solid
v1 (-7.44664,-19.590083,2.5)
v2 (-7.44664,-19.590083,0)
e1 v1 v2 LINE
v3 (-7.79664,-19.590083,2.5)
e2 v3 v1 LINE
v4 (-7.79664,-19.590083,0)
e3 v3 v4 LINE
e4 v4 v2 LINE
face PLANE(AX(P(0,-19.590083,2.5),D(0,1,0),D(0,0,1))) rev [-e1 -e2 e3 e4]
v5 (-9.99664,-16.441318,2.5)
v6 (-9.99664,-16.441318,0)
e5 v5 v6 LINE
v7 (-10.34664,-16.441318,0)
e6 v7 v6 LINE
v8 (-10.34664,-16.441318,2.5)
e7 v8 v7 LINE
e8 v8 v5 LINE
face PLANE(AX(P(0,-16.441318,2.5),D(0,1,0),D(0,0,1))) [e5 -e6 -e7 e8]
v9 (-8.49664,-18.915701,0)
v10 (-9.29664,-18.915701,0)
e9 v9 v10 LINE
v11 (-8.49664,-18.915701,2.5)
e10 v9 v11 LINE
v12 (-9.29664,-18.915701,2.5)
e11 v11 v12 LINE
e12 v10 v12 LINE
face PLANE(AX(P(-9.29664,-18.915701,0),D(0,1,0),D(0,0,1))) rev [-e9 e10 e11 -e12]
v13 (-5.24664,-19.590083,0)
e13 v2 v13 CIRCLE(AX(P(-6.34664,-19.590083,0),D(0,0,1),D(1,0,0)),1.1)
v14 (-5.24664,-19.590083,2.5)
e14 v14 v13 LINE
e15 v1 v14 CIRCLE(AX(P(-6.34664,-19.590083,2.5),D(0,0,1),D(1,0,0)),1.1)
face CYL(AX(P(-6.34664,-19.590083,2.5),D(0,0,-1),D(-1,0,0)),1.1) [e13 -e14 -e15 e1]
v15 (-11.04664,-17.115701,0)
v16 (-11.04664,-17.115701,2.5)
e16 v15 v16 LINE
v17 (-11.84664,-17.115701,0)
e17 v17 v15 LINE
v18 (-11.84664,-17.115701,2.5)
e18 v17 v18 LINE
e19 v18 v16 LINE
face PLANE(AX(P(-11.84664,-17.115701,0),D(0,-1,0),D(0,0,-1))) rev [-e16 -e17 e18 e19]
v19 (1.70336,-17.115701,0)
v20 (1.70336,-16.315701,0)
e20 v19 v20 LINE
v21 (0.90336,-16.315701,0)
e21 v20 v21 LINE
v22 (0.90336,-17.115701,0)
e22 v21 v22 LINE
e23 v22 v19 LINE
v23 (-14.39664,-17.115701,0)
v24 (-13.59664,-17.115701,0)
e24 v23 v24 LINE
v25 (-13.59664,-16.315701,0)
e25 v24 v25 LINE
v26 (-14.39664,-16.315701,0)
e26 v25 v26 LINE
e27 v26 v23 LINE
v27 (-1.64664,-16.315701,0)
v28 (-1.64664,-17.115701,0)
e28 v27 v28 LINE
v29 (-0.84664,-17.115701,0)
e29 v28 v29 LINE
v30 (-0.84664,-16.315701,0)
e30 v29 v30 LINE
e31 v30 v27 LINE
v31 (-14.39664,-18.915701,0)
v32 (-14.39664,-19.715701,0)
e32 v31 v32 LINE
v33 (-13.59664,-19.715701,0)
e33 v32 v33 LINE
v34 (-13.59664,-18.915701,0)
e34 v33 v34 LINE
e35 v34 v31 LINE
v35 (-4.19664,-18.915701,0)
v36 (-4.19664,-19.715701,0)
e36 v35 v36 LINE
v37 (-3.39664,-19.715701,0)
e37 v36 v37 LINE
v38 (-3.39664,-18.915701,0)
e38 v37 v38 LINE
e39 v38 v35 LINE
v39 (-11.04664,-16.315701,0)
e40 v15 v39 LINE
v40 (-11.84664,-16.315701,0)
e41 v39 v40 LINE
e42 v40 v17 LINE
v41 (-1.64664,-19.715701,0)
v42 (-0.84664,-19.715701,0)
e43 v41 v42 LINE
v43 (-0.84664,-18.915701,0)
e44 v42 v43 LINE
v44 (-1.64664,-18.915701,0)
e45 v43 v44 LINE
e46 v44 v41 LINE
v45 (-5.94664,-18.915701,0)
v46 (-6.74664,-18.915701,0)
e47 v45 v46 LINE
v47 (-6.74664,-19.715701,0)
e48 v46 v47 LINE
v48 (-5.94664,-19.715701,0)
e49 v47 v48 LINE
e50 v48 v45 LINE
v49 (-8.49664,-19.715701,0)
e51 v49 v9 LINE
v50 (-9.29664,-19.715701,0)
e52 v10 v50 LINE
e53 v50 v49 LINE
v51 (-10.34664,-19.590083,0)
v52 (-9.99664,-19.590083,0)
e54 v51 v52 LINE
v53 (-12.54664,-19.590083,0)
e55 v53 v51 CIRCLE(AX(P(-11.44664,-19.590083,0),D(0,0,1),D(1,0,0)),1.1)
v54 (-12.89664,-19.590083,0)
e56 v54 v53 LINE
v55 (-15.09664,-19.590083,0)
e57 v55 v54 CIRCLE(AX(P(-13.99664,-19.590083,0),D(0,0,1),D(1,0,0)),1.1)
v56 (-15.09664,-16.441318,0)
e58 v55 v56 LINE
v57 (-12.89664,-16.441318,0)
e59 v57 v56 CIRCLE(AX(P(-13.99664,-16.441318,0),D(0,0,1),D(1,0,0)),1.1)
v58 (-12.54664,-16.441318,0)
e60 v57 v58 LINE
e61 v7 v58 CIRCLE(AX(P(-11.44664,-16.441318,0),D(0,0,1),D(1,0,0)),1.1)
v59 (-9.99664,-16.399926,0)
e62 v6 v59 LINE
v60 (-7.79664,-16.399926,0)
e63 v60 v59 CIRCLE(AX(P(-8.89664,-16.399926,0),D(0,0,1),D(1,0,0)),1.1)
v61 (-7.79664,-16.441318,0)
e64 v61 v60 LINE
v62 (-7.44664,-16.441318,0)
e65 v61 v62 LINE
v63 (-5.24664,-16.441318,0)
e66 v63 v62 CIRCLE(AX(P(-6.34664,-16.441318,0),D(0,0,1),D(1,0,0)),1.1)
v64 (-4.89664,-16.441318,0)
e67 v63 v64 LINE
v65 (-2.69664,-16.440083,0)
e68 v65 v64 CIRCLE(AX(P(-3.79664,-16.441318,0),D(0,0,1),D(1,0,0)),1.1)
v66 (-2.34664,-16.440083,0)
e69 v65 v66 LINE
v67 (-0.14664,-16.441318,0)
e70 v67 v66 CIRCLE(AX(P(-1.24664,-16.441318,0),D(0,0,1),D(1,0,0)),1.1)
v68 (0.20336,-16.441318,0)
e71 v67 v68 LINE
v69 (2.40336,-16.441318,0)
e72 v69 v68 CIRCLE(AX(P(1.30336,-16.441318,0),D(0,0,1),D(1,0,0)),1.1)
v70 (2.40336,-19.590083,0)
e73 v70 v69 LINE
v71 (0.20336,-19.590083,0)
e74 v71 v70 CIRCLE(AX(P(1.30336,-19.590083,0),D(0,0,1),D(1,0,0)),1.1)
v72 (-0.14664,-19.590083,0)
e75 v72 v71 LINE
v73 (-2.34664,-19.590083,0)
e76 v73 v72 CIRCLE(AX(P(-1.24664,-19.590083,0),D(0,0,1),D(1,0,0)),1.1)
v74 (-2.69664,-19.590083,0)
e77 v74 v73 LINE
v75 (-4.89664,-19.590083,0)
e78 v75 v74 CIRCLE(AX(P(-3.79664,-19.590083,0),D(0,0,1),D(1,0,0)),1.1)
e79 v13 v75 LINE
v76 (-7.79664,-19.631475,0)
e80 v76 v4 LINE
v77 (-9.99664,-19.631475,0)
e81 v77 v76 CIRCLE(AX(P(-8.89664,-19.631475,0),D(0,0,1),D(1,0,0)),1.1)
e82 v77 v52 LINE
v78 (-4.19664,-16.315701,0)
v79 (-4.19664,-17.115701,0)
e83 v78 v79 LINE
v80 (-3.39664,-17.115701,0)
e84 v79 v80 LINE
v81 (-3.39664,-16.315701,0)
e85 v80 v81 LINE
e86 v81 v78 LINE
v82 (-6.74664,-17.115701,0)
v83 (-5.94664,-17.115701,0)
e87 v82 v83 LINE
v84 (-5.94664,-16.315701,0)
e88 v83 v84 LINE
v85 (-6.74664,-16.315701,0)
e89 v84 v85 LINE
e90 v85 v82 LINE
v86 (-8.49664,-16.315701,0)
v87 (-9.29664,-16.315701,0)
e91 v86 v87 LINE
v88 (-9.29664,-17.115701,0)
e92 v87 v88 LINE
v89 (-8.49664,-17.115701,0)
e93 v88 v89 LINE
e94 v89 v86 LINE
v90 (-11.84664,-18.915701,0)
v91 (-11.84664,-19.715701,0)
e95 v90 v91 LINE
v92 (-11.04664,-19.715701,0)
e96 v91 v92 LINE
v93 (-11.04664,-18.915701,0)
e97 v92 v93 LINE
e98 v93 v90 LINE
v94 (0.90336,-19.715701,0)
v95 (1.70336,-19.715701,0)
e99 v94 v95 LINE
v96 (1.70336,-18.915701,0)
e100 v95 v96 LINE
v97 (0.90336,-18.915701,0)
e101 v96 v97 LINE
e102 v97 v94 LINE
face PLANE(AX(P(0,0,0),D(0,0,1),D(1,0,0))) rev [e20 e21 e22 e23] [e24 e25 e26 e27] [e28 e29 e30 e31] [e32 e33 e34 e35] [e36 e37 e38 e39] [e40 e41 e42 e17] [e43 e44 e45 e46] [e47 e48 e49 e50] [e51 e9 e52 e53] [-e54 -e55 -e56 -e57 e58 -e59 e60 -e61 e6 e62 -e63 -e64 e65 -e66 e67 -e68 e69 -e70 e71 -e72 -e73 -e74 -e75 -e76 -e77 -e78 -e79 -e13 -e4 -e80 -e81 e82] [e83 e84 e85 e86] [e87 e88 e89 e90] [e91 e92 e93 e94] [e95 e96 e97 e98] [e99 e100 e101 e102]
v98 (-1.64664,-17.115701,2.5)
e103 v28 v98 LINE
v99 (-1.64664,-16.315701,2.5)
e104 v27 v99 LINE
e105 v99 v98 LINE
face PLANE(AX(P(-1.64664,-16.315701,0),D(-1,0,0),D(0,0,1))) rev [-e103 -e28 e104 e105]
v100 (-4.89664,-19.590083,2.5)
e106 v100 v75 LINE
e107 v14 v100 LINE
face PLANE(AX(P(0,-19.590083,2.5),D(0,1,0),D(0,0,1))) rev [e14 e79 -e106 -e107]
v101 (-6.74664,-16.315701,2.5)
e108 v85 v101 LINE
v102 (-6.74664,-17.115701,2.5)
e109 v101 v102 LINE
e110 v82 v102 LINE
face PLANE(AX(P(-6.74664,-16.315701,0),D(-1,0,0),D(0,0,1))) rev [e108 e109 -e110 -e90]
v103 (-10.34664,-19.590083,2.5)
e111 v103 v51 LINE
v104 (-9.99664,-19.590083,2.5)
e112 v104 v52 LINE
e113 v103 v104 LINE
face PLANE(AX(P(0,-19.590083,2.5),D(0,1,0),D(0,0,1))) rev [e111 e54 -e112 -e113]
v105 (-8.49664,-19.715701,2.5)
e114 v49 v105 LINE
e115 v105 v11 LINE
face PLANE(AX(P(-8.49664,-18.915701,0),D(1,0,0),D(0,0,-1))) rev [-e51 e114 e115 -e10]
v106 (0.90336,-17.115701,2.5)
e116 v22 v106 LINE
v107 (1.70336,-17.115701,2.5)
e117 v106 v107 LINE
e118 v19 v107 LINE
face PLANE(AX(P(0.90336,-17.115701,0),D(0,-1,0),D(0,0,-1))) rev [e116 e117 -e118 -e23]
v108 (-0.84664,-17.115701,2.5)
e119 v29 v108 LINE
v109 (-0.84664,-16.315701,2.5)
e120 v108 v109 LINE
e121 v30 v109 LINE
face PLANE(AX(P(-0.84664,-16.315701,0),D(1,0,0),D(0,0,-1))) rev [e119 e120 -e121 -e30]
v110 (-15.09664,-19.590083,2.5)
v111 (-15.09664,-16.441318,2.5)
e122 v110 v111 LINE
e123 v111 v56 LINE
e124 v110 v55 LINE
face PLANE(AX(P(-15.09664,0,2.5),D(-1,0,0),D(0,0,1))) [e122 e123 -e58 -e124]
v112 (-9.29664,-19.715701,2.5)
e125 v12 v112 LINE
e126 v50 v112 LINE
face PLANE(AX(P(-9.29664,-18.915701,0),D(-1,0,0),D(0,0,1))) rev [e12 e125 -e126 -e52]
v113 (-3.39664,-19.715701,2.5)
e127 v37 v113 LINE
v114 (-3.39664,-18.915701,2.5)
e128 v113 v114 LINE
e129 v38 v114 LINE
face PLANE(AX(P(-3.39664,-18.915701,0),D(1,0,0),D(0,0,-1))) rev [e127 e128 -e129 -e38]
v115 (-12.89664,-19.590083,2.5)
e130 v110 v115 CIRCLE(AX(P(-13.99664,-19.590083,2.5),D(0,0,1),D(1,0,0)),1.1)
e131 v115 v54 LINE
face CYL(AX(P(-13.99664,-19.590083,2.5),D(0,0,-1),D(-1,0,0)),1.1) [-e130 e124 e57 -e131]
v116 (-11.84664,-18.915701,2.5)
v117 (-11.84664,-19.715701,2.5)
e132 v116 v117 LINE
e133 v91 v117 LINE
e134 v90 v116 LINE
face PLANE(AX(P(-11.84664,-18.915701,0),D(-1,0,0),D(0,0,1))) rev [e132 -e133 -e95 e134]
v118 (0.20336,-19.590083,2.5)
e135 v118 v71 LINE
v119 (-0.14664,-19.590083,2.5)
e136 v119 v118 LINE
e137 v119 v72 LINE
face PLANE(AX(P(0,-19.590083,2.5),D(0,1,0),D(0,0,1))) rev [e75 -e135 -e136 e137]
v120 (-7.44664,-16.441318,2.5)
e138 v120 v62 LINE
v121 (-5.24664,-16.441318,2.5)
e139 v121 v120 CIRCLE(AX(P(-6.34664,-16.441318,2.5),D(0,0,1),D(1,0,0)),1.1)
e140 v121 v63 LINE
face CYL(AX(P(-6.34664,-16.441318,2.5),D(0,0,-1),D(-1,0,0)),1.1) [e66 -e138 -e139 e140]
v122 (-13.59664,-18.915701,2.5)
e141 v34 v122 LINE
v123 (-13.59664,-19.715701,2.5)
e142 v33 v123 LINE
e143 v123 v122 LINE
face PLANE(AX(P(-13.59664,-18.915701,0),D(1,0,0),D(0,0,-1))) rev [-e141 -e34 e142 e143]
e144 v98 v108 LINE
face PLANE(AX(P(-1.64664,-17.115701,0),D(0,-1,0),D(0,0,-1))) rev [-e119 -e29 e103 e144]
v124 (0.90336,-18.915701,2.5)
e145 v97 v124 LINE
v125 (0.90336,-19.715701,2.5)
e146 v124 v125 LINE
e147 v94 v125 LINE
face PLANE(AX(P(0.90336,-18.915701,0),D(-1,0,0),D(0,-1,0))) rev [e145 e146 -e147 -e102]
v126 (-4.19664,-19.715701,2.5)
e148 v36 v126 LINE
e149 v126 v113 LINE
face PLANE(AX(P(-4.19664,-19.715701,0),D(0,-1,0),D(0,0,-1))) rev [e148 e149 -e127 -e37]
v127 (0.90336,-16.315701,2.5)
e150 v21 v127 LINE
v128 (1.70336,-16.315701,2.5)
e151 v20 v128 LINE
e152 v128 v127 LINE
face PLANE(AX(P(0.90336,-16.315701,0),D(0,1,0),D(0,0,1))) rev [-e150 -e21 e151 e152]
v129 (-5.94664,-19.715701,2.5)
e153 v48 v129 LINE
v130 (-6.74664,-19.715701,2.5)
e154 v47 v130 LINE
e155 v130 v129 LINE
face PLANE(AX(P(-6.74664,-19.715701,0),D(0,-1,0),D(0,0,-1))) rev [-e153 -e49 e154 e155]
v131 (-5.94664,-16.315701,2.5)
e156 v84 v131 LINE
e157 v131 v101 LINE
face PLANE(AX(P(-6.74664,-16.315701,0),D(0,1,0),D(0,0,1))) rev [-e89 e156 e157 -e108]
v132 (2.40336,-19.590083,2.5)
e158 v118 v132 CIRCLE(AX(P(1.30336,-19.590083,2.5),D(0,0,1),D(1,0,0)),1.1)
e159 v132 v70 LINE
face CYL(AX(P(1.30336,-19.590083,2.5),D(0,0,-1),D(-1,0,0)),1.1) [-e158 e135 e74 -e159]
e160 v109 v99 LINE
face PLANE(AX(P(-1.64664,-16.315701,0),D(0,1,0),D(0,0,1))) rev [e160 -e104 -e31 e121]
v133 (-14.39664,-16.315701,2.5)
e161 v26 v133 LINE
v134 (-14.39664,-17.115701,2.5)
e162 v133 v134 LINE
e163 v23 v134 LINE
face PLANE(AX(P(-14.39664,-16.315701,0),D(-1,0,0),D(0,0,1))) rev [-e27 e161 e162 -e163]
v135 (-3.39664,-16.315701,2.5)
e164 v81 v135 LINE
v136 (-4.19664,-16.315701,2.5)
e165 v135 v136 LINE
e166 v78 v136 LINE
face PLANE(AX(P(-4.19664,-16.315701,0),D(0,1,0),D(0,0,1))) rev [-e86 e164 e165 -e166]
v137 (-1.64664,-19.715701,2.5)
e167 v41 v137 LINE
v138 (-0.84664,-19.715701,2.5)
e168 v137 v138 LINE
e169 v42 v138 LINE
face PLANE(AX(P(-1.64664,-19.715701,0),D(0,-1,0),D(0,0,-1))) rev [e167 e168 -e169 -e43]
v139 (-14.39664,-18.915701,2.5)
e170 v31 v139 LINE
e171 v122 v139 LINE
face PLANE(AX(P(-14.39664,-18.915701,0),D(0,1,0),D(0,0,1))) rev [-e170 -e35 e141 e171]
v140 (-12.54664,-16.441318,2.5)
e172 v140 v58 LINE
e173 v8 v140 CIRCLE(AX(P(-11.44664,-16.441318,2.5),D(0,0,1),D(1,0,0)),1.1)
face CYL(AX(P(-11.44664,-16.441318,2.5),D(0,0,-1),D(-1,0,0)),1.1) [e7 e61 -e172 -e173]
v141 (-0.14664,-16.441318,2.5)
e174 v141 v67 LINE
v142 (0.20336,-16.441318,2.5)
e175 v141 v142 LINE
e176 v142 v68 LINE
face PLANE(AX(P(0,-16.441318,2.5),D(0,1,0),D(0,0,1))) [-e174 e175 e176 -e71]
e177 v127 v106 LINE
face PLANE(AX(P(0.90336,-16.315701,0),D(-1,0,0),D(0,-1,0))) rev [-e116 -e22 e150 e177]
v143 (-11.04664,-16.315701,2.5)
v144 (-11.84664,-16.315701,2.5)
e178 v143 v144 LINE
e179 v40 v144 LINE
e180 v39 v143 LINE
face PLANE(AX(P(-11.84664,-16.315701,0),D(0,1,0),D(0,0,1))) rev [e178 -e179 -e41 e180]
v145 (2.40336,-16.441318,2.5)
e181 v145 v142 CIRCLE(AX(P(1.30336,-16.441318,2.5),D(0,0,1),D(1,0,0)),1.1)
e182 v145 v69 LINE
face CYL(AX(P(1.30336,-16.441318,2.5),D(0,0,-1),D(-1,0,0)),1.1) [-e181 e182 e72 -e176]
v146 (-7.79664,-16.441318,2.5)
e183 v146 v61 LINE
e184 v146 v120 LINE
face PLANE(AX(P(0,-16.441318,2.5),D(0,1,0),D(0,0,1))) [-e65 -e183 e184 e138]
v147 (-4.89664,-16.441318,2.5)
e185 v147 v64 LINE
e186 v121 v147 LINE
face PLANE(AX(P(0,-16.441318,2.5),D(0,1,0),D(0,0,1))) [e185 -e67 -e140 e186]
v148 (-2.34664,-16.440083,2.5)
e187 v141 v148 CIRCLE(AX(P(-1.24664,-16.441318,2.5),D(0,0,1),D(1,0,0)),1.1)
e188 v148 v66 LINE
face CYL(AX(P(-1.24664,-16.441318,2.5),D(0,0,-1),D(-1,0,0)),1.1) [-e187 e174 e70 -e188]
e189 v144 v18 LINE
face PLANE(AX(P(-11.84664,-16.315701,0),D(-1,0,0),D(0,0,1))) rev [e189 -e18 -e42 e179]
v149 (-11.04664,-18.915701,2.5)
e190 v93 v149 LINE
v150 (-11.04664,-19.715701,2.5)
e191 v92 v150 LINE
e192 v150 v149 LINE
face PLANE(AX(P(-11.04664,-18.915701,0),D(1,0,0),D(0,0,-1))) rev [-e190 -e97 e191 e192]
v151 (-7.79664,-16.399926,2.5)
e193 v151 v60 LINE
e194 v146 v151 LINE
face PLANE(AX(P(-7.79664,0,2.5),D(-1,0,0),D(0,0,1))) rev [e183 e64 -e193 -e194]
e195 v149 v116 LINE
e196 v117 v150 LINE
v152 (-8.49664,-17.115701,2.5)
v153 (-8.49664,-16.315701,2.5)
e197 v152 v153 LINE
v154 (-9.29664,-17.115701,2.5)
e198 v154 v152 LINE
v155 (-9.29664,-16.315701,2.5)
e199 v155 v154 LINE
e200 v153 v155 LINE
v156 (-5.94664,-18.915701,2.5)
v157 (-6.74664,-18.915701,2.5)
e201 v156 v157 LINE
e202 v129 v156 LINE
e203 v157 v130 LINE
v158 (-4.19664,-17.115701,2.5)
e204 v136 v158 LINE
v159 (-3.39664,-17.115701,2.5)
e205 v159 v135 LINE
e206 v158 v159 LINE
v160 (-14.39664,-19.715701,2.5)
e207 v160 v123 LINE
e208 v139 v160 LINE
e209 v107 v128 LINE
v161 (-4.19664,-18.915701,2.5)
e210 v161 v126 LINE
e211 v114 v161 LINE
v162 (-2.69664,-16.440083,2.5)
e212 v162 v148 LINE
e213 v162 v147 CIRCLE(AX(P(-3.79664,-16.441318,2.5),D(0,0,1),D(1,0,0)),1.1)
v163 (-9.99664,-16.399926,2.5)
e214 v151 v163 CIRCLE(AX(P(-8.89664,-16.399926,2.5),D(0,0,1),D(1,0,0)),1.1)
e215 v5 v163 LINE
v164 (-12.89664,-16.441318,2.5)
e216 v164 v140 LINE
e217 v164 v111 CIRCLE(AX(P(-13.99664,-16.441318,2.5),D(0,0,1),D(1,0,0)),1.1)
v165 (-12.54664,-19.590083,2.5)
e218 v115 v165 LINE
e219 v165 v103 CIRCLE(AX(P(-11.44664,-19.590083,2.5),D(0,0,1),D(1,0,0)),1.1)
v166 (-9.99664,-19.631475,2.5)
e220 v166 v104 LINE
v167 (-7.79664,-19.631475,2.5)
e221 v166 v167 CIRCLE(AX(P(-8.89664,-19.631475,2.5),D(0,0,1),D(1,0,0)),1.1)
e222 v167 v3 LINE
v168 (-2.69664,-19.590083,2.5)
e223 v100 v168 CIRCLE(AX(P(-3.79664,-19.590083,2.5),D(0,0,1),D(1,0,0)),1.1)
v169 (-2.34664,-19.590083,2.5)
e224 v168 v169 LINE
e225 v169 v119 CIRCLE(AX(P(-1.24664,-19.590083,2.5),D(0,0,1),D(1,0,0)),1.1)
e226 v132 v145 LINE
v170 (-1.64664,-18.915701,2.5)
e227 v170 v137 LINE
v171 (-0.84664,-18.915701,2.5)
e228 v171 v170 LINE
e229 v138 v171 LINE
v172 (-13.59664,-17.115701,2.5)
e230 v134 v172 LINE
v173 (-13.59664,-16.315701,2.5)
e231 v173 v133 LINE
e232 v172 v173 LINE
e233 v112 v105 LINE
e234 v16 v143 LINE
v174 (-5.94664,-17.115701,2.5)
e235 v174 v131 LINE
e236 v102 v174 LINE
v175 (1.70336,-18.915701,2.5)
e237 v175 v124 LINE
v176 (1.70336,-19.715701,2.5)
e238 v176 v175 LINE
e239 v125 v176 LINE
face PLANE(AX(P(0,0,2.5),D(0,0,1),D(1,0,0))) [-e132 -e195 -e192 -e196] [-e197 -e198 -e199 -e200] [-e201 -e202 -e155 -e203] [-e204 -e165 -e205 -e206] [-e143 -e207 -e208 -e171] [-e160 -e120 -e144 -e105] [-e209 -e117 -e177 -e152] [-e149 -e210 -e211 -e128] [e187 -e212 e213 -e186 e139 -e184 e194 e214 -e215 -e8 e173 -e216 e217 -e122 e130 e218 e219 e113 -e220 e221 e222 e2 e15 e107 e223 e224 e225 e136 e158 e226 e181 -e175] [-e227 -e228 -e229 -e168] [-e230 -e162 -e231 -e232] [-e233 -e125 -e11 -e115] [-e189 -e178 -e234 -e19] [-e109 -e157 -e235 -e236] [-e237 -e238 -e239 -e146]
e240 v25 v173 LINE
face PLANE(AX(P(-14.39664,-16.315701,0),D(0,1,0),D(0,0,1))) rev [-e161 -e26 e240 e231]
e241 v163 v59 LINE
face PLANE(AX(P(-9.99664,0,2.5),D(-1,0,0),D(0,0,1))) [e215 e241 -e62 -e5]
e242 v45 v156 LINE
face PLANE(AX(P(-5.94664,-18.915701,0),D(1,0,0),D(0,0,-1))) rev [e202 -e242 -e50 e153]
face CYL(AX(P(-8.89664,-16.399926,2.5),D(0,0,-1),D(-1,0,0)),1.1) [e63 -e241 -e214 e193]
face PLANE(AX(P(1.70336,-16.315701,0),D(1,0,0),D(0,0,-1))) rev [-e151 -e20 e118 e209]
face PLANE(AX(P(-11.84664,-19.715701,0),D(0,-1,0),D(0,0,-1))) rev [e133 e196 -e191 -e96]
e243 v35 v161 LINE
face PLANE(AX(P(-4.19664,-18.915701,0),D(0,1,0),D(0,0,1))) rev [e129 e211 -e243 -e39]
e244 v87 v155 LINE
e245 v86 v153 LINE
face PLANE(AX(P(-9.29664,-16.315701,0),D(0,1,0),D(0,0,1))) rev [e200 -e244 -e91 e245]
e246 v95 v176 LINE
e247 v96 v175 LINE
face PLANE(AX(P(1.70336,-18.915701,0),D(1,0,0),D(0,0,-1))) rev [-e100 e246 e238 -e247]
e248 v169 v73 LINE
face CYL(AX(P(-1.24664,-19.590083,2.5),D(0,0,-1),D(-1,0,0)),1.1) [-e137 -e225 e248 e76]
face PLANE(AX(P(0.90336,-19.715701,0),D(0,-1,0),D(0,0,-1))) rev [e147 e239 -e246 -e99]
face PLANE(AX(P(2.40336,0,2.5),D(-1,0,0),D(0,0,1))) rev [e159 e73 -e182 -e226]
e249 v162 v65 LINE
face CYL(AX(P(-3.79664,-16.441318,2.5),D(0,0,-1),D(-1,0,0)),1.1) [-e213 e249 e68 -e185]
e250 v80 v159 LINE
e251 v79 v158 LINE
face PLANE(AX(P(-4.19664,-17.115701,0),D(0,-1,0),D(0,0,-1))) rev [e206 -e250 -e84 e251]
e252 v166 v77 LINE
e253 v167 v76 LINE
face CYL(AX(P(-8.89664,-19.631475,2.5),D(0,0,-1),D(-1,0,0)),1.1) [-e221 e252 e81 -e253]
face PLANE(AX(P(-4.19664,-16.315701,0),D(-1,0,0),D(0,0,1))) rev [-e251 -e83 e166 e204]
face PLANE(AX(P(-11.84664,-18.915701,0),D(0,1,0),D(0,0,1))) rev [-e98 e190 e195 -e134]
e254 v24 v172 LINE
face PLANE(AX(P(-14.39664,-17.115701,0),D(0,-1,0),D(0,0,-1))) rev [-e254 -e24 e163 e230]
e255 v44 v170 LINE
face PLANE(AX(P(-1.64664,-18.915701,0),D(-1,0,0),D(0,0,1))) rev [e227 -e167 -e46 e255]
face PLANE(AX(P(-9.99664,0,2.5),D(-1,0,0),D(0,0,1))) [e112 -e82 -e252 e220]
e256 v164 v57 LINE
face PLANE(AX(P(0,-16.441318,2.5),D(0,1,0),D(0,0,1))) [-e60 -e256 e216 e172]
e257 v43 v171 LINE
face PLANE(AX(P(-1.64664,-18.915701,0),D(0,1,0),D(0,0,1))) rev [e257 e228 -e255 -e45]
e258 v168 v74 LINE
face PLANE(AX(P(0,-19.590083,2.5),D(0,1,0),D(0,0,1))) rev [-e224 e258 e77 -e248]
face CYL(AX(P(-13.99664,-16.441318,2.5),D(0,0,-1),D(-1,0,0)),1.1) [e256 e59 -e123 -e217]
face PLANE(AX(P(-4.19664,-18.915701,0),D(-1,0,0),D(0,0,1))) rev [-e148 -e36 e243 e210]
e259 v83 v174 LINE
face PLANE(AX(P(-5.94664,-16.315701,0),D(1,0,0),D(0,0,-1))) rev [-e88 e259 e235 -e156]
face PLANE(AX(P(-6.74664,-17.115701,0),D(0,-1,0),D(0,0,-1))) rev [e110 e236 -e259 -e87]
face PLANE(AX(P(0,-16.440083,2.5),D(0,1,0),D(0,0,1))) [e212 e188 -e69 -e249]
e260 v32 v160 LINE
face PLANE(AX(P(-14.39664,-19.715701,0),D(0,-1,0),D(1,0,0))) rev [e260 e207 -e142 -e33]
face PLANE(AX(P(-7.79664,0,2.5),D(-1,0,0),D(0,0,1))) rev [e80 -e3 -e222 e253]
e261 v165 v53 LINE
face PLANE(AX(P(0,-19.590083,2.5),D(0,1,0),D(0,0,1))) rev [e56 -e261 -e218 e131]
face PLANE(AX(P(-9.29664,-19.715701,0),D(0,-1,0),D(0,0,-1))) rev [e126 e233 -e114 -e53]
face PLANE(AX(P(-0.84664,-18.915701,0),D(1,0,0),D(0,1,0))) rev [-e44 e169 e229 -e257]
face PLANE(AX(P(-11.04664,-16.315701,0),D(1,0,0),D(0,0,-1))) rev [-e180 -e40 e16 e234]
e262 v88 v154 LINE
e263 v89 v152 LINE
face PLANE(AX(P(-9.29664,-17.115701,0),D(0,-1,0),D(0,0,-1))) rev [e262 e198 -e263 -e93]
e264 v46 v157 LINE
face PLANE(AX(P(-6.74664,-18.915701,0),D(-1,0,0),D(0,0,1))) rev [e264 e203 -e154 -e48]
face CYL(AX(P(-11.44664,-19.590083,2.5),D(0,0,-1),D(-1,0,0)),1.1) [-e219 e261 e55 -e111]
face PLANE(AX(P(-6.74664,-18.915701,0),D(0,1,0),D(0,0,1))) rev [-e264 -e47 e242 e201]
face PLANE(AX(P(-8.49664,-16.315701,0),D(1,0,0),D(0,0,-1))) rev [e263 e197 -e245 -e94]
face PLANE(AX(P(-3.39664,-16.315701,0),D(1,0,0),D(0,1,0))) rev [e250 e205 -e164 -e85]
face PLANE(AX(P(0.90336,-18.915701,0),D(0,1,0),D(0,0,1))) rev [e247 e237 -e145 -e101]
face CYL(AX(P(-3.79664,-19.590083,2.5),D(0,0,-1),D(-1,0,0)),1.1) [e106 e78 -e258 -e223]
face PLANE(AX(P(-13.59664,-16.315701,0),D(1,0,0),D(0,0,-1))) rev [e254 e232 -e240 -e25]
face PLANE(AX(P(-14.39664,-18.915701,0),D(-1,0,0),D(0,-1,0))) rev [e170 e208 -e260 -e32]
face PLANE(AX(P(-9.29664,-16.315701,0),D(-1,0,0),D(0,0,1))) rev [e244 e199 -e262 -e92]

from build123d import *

# Parameters (mm, degrees)
P_IDAT_VYSUNUT_M2_DEPTH  = 2.5
SKICA3_W                 = 0.8
SKICA3_H                 = 0.8
ODEBRAT_VYSUNUT_M1_DEPTH = 2.5


# Read off the part's stored shape, not the designer's step: Přidat vysunutím2
with BuildPart() as part:
    # Přidat vysunutím2 outline → Přidat vysunutím2 (new body)
    with BuildSketch(Plane.XY):
        with BuildLine():
            Line((2.40336004, -19.590083306), (2.40336004, -16.441317707))
            ThreePointArc((2.40336004, -16.441317707), (1.30336004, -15.341317707), (0.20336004, -16.441317707))
            Line((0.20336004, -16.441317707), (-0.14663996, -16.441317707))
            ThreePointArc((-0.14663996, -16.441317707), (-1.24602276, -15.34131788), (-2.346639267, -16.440083307))
            Line((-2.346639267, -16.440083307), (-2.696640653, -16.440083307))
            ThreePointArc((-2.696640653, -16.440083307), (-3.79725716, -15.34131788), (-4.89663996, -16.441317707))
            Line((-4.89663996, -16.441317707), (-5.24663996, -16.441317707))
            ThreePointArc((-5.24663996, -16.441317707), (-6.34663996, -15.341317707), (-7.44663996, -16.441317707))
            Line((-7.44663996, -16.441317707), (-7.79663996, -16.441317707))
            Line((-7.79663996, -16.441317707), (-7.79663996, -16.399925636))
            ThreePointArc((-7.79663996, -16.399925636), (-8.89663996, -15.299925636), (-9.99663996, -16.399925636))
            Line((-9.99663996, -16.399925636), (-9.99663996, -16.441317707))
            Line((-9.99663996, -16.441317707), (-10.34663996, -16.441317707))
            ThreePointArc((-10.34663996, -16.441317707), (-11.44663996, -15.341317707), (-12.54663996, -16.441317707))
            Line((-12.54663996, -16.441317707), (-12.89663996, -16.441317707))
            ThreePointArc((-12.89663996, -16.441317707), (-13.99663996, -15.341317707), (-15.09663996, -16.441317707))
            Line((-15.09663996, -16.441317707), (-15.09663996, -19.590083306))
            ThreePointArc((-15.09663996, -19.590083306), (-13.99663996, -20.690083306), (-12.89663996, -19.590083306))
            Line((-12.89663996, -19.590083306), (-12.54663996, -19.590083306))
            ThreePointArc((-12.54663996, -19.590083306), (-11.44663996, -20.690083306), (-10.34663996, -19.590083306))
            Line((-10.34663996, -19.590083306), (-9.99663996, -19.590083306))
            Line((-9.99663996, -19.590083306), (-9.99663996, -19.631475378))
            ThreePointArc((-9.99663996, -19.631475378), (-8.89663996, -20.731475378), (-7.79663996, -19.631475378))
            Line((-7.79663996, -19.631475378), (-7.79663996, -19.590083306))
            Line((-7.79663996, -19.590083306), (-7.44663996, -19.590083306))
            ThreePointArc((-7.44663996, -19.590083306), (-6.34663996, -20.690083306), (-5.24663996, -19.590083306))
            Line((-5.24663996, -19.590083306), (-4.89663996, -19.590083306))
            ThreePointArc((-4.89663996, -19.590083306), (-3.79663996, -20.690083306), (-2.69663996, -19.590083306))
            Line((-2.69663996, -19.590083306), (-2.34663996, -19.590083306))
            ThreePointArc((-2.34663996, -19.590083306), (-1.24663996, -20.690083306), (-0.14663996, -19.590083306))
            Line((-0.14663996, -19.590083306), (0.20336004, -19.590083306))
            ThreePointArc((0.20336004, -19.590083306), (1.30336004, -20.690083306), (2.40336004, -19.590083306))
        make_face()
    extrude(amount=P_IDAT_VYSUNUT_M2_DEPTH)

    # Skica3 → Odebrat vysunutím1 (cut)
    with BuildSketch(Plane.XY.offset(2.5)):
        with Locations((-13.99663996, -16.715700507)):
            Rectangle(SKICA3_W, SKICA3_H)
        with Locations((-13.99663996, -19.315700507)):
            Rectangle(SKICA3_W, SKICA3_H)
        with Locations((-8.89663996, -16.715700507)):
            Rectangle(SKICA3_W, SKICA3_H)
        with Locations((-11.44663996, -16.715700507)):
            Rectangle(SKICA3_W, SKICA3_H)
        with Locations((-11.44663996, -19.315700507)):
            Rectangle(SKICA3_W, SKICA3_H)
        with Locations((-8.89663996, -19.315700507)):
            Rectangle(SKICA3_W, SKICA3_H)
        with Locations((-6.34663996, -16.715700507)):
            Rectangle(SKICA3_W, SKICA3_H)
        with Locations((-6.34663996, -19.315700507)):
            Rectangle(SKICA3_W, SKICA3_H)
        with Locations((-3.79663996, -16.715700507)):
            Rectangle(SKICA3_W, SKICA3_H)
        with Locations((-3.79663996, -19.315700507)):
            Rectangle(SKICA3_W, SKICA3_H)
        with Locations((-1.24663996, -16.715700507)):
            Rectangle(SKICA3_W, SKICA3_H)
        with Locations((-1.24663996, -19.315700507)):
            Rectangle(SKICA3_W, SKICA3_H)
        with Locations((1.30336004, -16.715700507)):
            Rectangle(SKICA3_W, SKICA3_H)
        with Locations((1.30336004, -19.315700507)):
            Rectangle(SKICA3_W, SKICA3_H)
    extrude(amount=-ODEBRAT_VYSUNUT_M1_DEPTH, mode=Mode.SUBTRACT)


solid = part.part
